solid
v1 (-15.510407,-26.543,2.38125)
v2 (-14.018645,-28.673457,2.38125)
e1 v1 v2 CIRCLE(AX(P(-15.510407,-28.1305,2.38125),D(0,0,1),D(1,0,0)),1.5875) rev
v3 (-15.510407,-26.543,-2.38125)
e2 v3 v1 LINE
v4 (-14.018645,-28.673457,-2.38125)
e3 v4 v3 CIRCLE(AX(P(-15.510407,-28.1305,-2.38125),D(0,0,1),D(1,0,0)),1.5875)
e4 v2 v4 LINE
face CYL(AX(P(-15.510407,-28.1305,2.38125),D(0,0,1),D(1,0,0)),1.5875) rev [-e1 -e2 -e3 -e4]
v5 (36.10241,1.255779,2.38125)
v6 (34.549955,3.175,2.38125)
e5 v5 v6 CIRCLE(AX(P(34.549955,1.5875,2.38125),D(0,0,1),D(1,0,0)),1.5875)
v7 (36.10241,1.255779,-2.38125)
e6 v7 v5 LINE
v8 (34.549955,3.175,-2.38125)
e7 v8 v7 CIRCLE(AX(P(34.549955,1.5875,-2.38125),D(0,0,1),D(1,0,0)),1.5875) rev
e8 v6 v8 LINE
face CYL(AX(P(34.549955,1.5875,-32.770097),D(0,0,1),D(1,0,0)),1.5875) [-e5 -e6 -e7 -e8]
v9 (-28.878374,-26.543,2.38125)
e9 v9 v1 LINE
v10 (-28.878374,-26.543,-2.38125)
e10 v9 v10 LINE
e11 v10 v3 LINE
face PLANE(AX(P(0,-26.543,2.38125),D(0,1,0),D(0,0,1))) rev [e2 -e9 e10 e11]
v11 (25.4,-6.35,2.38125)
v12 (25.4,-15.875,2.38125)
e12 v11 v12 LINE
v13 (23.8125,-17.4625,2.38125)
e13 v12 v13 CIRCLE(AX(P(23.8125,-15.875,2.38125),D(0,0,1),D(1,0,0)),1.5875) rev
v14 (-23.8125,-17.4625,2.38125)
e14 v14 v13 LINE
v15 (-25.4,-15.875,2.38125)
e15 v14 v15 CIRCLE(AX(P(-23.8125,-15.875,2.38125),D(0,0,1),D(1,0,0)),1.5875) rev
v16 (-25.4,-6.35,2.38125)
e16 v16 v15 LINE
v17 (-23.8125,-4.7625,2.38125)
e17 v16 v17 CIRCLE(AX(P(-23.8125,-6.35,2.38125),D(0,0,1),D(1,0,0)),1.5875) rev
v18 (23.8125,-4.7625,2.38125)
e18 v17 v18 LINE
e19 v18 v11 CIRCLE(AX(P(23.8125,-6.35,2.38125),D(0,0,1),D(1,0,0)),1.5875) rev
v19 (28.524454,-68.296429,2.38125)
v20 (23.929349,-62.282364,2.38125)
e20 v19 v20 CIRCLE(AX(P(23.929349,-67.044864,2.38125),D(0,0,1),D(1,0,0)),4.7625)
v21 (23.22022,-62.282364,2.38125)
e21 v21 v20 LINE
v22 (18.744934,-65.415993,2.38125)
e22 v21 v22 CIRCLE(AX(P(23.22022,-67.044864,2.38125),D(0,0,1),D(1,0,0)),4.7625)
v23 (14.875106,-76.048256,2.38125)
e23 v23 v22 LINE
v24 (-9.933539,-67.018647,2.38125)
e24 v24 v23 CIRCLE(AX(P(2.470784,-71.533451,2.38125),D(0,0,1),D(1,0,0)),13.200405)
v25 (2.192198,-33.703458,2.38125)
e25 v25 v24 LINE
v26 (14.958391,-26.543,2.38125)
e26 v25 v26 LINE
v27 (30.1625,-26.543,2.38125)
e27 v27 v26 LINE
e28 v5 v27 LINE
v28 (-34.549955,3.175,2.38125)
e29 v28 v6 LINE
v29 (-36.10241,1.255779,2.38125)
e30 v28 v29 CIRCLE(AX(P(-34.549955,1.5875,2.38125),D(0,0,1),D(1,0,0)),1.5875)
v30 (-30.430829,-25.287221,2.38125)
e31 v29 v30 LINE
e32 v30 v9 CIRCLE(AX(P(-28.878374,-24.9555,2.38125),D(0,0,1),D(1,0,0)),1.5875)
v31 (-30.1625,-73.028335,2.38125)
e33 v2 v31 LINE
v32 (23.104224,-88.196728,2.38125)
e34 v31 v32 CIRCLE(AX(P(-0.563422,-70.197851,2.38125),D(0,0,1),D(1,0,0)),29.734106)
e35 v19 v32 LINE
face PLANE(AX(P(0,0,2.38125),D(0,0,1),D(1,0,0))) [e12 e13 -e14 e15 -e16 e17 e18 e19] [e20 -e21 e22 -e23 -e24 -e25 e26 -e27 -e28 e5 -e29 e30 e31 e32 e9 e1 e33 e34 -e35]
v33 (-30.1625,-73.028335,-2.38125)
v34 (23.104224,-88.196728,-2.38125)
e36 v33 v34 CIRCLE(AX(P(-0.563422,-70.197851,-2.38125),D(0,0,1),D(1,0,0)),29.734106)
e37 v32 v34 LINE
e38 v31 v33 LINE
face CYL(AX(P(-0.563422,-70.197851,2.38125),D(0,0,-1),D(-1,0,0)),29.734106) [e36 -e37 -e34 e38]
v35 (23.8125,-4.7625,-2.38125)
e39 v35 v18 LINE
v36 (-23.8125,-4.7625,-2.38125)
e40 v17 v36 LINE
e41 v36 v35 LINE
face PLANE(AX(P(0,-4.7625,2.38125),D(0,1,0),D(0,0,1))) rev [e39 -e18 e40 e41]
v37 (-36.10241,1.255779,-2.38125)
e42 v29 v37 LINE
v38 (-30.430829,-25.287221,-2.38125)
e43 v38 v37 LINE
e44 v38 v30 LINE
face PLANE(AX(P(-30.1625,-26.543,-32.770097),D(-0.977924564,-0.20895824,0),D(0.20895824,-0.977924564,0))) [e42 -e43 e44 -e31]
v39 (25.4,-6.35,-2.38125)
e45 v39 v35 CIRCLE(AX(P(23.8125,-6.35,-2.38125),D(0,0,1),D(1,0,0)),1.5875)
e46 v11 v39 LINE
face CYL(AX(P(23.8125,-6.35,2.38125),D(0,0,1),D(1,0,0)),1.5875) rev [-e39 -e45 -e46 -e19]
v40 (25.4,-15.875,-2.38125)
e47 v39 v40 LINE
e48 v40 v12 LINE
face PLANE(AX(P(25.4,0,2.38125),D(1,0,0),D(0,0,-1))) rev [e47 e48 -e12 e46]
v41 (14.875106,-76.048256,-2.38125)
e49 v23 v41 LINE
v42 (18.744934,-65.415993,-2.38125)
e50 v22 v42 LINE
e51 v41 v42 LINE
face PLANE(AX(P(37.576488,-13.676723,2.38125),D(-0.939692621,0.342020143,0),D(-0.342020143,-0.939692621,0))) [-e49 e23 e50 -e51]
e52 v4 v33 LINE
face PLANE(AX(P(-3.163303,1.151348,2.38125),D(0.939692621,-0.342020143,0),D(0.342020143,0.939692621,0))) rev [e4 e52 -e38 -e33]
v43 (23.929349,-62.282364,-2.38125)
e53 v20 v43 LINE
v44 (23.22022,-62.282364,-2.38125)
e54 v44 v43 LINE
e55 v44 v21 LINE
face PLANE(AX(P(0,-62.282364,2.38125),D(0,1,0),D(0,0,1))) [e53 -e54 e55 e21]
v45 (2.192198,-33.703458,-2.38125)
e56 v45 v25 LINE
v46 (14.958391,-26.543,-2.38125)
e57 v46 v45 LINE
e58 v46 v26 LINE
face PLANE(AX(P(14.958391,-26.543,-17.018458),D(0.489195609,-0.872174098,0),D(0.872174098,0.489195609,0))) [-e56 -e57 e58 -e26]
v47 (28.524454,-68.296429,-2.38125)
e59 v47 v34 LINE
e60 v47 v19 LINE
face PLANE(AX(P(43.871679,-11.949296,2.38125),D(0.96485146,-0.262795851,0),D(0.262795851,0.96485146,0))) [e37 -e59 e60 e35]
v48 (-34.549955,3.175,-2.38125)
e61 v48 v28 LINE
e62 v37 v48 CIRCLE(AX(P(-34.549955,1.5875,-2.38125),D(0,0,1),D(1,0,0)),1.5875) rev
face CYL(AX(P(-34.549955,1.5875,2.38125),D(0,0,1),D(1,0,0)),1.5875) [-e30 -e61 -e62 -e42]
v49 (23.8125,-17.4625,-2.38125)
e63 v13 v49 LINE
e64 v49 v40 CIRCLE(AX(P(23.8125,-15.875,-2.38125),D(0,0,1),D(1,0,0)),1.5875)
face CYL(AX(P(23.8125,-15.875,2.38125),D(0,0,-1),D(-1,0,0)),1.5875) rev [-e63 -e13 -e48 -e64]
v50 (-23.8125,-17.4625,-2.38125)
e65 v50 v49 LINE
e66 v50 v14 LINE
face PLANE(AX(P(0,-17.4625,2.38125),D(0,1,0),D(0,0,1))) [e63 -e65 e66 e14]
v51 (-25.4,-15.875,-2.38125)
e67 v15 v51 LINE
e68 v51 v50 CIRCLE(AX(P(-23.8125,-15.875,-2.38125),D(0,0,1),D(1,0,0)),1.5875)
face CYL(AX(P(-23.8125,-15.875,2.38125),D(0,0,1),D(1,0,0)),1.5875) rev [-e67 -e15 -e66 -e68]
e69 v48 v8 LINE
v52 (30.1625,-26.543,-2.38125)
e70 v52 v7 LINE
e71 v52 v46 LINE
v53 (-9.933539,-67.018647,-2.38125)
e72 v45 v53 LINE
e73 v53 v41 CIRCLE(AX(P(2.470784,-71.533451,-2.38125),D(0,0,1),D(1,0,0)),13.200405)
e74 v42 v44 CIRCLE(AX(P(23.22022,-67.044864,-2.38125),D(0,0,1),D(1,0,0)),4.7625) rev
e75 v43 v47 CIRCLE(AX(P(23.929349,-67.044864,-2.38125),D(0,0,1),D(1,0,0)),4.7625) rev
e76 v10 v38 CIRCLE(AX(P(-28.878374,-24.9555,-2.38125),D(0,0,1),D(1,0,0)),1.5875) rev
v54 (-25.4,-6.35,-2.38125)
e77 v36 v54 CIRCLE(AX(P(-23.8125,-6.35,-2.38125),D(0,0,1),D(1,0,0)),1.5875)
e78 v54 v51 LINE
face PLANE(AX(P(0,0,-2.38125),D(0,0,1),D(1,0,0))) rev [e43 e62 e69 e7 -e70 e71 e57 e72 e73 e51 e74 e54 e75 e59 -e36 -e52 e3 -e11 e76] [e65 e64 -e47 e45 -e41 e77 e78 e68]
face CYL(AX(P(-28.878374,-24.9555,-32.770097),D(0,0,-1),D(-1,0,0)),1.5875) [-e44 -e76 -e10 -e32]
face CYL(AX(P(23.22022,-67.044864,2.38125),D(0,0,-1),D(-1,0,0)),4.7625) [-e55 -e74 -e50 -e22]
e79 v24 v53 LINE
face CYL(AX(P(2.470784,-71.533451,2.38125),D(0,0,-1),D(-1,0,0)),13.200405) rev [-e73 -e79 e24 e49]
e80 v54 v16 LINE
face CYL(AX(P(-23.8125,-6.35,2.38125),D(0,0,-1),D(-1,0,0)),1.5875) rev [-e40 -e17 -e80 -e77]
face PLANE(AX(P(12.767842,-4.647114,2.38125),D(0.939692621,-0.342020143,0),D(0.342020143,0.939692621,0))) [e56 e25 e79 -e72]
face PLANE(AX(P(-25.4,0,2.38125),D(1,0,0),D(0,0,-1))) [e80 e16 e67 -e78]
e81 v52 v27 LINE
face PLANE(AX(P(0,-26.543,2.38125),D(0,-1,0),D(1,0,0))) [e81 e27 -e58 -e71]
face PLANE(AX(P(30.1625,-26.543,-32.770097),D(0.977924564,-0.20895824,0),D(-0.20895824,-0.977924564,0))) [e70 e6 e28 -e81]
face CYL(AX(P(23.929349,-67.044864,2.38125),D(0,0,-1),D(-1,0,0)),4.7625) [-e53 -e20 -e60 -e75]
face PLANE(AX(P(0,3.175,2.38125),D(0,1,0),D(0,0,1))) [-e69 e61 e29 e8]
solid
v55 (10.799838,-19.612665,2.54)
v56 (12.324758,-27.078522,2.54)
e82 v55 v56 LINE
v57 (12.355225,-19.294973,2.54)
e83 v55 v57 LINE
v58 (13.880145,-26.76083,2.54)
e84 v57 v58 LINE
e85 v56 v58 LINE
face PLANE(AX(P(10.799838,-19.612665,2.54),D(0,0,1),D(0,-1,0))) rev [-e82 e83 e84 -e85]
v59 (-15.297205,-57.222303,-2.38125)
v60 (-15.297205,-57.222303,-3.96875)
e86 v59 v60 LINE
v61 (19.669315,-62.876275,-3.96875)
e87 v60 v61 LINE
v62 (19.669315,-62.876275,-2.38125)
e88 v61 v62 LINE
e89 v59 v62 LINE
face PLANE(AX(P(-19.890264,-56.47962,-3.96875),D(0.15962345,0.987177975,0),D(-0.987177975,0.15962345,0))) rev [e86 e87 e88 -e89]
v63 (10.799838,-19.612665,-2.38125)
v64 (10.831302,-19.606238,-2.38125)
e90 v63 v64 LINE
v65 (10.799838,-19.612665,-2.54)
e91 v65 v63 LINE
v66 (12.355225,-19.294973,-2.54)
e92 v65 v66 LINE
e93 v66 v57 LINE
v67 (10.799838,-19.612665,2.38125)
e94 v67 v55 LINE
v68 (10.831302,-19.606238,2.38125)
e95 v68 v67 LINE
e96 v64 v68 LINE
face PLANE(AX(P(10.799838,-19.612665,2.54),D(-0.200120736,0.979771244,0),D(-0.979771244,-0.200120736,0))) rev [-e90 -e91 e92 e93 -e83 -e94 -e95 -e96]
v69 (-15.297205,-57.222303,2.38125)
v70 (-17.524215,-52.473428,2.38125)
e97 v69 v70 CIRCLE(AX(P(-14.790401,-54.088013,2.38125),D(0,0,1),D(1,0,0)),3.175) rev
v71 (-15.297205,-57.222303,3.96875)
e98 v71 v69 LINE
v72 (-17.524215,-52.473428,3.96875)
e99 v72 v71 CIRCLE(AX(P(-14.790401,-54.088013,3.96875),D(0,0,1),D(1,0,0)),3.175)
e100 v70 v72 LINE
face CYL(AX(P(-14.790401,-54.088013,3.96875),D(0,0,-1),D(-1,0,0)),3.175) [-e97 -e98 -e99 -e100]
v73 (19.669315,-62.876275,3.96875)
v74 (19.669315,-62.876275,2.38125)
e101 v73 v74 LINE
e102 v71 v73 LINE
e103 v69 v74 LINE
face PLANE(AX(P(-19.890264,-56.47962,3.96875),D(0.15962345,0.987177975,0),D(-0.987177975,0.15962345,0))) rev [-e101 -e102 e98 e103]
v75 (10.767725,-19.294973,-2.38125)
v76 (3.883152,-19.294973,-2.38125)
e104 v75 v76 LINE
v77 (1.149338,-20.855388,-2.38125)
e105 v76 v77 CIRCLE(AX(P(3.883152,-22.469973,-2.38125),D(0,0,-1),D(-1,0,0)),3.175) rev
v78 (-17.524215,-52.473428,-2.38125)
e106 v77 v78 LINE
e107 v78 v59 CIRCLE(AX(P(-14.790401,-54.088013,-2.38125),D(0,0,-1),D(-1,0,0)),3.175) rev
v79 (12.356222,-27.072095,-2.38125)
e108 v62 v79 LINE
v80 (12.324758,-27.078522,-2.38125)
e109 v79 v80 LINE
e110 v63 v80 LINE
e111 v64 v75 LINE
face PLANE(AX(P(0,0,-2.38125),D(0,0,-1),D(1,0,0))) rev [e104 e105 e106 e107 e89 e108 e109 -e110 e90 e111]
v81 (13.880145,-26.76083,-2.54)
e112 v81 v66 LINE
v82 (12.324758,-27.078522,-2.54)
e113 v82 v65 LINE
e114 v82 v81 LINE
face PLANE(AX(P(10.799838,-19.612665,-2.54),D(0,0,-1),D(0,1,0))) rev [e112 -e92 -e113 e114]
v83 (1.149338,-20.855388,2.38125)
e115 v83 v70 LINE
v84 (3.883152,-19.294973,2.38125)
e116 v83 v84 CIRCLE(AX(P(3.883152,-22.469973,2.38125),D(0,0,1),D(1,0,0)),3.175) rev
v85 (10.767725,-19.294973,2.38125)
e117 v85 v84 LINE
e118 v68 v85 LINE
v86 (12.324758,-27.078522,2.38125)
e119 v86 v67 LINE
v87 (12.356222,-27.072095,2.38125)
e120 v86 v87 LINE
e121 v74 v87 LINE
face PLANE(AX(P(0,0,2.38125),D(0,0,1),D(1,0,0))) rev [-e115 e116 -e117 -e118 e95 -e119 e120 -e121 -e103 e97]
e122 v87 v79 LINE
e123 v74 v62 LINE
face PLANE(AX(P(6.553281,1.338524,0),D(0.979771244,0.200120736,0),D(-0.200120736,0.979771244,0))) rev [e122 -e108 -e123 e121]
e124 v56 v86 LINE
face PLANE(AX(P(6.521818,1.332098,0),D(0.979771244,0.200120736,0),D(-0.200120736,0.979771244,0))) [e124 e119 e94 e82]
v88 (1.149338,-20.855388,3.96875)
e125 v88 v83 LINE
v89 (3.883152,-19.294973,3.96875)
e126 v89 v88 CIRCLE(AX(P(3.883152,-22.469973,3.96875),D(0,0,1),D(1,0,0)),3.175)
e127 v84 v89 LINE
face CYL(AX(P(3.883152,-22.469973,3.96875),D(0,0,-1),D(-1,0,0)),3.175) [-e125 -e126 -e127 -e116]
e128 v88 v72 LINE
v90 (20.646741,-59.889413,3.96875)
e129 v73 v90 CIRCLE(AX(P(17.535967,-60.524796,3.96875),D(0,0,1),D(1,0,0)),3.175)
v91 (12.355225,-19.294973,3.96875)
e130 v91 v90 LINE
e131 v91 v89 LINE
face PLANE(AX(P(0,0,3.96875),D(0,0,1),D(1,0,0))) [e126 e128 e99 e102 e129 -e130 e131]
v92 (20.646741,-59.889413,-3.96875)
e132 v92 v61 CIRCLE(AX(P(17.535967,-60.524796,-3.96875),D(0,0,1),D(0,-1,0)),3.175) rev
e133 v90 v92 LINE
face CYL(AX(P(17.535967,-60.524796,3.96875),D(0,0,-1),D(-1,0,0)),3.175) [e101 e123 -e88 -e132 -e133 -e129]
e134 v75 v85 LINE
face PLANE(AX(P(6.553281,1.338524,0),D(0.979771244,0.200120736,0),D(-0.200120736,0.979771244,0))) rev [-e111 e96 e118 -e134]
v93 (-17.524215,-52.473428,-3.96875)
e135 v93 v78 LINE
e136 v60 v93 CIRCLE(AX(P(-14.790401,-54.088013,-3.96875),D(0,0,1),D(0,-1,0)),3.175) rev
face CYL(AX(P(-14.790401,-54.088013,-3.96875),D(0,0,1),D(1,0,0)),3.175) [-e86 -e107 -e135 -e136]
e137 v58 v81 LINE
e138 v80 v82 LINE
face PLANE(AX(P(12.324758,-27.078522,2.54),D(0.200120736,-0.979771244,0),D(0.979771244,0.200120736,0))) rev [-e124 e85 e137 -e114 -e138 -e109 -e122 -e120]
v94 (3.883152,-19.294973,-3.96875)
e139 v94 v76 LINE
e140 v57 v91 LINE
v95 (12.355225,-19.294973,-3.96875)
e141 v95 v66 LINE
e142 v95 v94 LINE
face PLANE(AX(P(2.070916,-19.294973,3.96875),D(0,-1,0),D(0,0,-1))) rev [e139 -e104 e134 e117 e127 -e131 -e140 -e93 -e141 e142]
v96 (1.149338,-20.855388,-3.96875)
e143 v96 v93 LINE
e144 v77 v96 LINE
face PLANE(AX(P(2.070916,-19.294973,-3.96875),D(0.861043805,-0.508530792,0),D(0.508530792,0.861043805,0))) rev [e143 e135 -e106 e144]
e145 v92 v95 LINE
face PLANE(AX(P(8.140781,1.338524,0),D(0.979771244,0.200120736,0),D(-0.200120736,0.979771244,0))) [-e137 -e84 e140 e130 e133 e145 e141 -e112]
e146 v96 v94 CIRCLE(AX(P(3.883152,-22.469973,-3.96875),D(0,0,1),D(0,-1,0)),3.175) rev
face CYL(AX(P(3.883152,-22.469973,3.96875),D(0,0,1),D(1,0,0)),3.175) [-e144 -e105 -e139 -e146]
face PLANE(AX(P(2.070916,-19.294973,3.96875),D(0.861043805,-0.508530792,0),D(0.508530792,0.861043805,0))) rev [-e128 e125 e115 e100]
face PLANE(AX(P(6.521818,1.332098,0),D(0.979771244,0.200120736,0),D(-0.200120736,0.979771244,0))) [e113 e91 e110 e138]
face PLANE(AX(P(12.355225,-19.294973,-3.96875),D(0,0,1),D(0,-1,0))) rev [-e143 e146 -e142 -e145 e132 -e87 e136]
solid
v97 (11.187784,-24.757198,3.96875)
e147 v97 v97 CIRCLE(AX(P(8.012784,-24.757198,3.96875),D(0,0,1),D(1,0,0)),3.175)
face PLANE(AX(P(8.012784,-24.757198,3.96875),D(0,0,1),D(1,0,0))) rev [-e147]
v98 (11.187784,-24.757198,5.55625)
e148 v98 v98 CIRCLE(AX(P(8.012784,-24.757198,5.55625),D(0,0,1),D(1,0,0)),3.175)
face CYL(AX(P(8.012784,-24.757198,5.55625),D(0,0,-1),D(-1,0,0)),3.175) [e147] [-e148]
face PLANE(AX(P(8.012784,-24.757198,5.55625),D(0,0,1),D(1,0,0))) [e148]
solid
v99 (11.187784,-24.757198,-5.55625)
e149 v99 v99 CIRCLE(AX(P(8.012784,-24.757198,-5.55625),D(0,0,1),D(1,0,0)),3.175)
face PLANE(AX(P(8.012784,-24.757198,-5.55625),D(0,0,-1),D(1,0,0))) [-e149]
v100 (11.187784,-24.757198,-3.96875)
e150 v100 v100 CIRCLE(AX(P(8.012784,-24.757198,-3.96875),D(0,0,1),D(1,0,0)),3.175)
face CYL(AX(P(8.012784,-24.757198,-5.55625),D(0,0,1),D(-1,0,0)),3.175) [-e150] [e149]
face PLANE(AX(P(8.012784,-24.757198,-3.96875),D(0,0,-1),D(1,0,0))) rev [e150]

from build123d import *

# Parameters (mm, degrees)
SKETCH1_W           = 60.325
SKETCH1_H           = 3.175
SKETCH1_W_2         = 50.8
SKETCH1_H_2         = 12.7
BOSS_EXTRUDE1_DEPTH = 2.38125
BOSS_EXTRUDE2_DEPTH = 1.5875
SKETCH3_W           = 7.9375
SKETCH3_H           = 44.481099137
BOSS_EXTRUDE3_DEPTH = 1.5875
FILLET1_R           = 3.175
SKETCH4_W           = 5.08
SKETCH4_H           = 7.62
CUT_EXTRUDE1_DEPTH  = 1.5875
SKETCH5_R           = 3.175
BOSS_EXTRUDE4_DEPTH = 1.5875
BOSS_EXTRUDE5_DEPTH = 4.7625
FILLET5_R           = 1.5875
BOSS_EXTRUDE6_DEPTH = 4.7625
FILLET6_R           = 1.5875
FILLET7_R           = 4.7625


with BuildPart() as part:
    # Sketch1 → Boss-Extrude1 (new, symmetric)
    # profile 1 of 2: a face of its own
    with BuildSketch(Plane.XY):
        with Locations((0, 1.5875)):
            Rectangle(SKETCH1_W, SKETCH1_H)
    # profile 2 of 2: a face of its own
    with BuildSketch(Plane.XY):
        with BuildLine():
            Line((30.1625, 0), (-30.1625, 0))
            Line((-30.1625, 0), (-30.1625, -26.543))
            Line((-30.1625, -26.543), (-13.24322167, -26.543))
            Line((-13.24322167, -26.543), (-30.1625, -73.028335164))
            ThreePointArc((-30.1625, -73.028335164), (-8.706855369, -98.7950809), (23.104224388, -88.196728338))
            Line((23.104224388, -88.196728338), (30.1625, -62.282363628))
            Line((30.1625, -62.282363628), (19.885481288, -62.282363628))
            Line((19.885481288, -62.282363628), (14.875106331, -76.048255685))
            ThreePointArc((14.875106331, -76.048255685), (-2.044020786, -83.937774229), (-9.93353933, -67.018647112))
            Line((-9.93353933, -67.018647112), (4.798391431, -26.543))
            Line((4.798391431, -26.543), (30.1625, -26.543))
            Line((30.1625, -26.543), (30.1625, 0))
        make_face()
        with Locations((0, -11.1125)):
            Rectangle(SKETCH1_W_2, SKETCH1_H_2, mode=Mode.SUBTRACT)
    extrude(amount=BOSS_EXTRUDE1_DEPTH, both=True)

    # Sketch6 → Boss-Extrude5 (add)
    with BuildSketch(Plane.XY.offset(2.38125)):
        Polygon((14.958391431, -26.543), (2.192197939, -33.70345777), (4.798391431, -26.543), align=None)
    extrude(amount=-BOSS_EXTRUDE5_DEPTH)

    # Fillet5
    fillet5_edges = [part.edges().sort_by_distance(p)[0] for p in [
        (-25.4, -4.7625, 0),
        (-25.4, -17.4625, 0),
        (25.4, -17.4625, 0),
        (25.4, -4.7625, 0),
    ]]
    fillet(fillet5_edges, radius=FILLET5_R)


with BuildPart() as body_2:
    # Sketch2 → Boss-Extrude2 (new body)
    with BuildSketch(Plane.XY.offset(2.38125)):
        Polygon((2.070915662, -19.294973045), (-19.890264434, -56.479620237), (19.669315265, -62.876274894), (10.767724981, -19.294973045), align=None)
    extrude(amount=BOSS_EXTRUDE2_DEPTH)


with BuildPart() as body_3:
    # Mirror1: mirrored copy
    add(body_2.part.mirror(Plane.XY))


with BuildPart() as body_2_1:
    add(body_2.part)

    add(body_3.part)  # Boss-Extrude3 merges body 3
    # Sketch3 → Boss-Extrude3 (add, along a direction that is not the sketch's normal)
    with BuildSketch(Plane(origin=(6.553281388, 1.338524171, 0), x_dir=(0, 0, -1), z_dir=(0.9797712442921276, 0.2001207357028661, 0))):
        with Locations((0, -43.300054363)):
            Rectangle(SKETCH3_W, SKETCH3_H)
    extrude(amount=BOSS_EXTRUDE3_DEPTH, dir=(1, 0, 0))

    # Fillet1
    # the kernel refuses this fillet: 3.175 mm, written as the material it takes off along each edge
    with BuildSketch(Plane(origin=(-19.890264434, -56.479620237, 9.250541142), x_dir=(0.5085307915682564, 0.8610438049408187, 0), z_dir=(0, 0, -1))) as fillet1_piece_1:
        with BuildLine():
            CenterArc((FILLET1_R * 1.46542250607, FILLET1_R), FILLET1_R, 158.619024622, 111.380975378)
            Line((FILLET1_R * 0.534245587006, FILLET1_R * 1.36456761432), (FILLET1_R * 0.515622048625, FILLET1_R * 1.37185896661))
            Line((FILLET1_R * 0.515622048625, FILLET1_R * 1.37185896661), (-FILLET1_R * 0.0293084501213, -FILLET1_R * 0.02))
            Line((-FILLET1_R * 0.0293084501213, -FILLET1_R * 0.02), (FILLET1_R * 1.46542250607, -FILLET1_R * 0.02))
            Line((FILLET1_R * 1.46542250607, -FILLET1_R * 0.02), (FILLET1_R * 1.46542250607, 0))
        make_face()
    extrude(amount=24.851082284, mode=Mode.SUBTRACT)
    with BuildSketch(Plane(origin=(21.256815265, -62.876274894, -11.590075114), x_dir=(-0.20012073570286557, 0.9797712442921276, 0), z_dir=(0, 0, 1))) as fillet1_piece_2:
        with BuildLine():
            CenterArc((3.048530046, 3.175), FILLET1_R, 210.671448693, 59.328551307)
            Line((0.317691668, 1.55538685), (0.2630749, 1.522994587))
            ThreePointArc((0.2630749, 1.522994587), (0.09663036, 0.790401092), (-0.062215474, 0.012707667))
            Line((-0.062215474, 0.012707667), (0, -0.0635))
            Line((0, -0.0635), (3.048530046, -0.0635))
            Line((3.048530046, -0.0635), (3.048530046, 0))
        make_face()
    extrude(amount=23.180150228, mode=Mode.SUBTRACT)
    with BuildSketch(Plane(origin=(-19.890264434, -56.479620237, -9.250541142), x_dir=(0.5085307915682564, 0.8610438049408187, 0), z_dir=(0, 0, 1))) as fillet1_piece_3:
        with BuildLine():
            CenterArc((FILLET1_R * 1.46542250607, -FILLET1_R), FILLET1_R, 90, 111.380975378)
            Line((FILLET1_R * 0.534245587006, -FILLET1_R * 1.36456761432), (FILLET1_R * 0.515622048625, -FILLET1_R * 1.37185896661))
            Line((FILLET1_R * 0.515622048625, -FILLET1_R * 1.37185896661), (-FILLET1_R * 0.0293084501213, FILLET1_R * 0.02))
            Line((-FILLET1_R * 0.0293084501213, FILLET1_R * 0.02), (FILLET1_R * 1.46542250607, FILLET1_R * 0.02))
            Line((FILLET1_R * 1.46542250607, FILLET1_R * 0.02), (FILLET1_R * 1.46542250607, 0))
        make_face()
    extrude(amount=24.851082284, mode=Mode.SUBTRACT)
    with BuildSketch(Plane(origin=(2.070915662, -19.294973045, 2.149340453), x_dir=(-0.5085307915682565, -0.8610438049408186, 0), z_dir=(0, 0, -1))) as fillet1_piece_4:
        with BuildLine():
            CenterArc((FILLET1_R * 0.570783049145, -FILLET1_R), FILLET1_R, 90, 59.433984029)
            Line((-FILLET1_R * 0.290260755796, -FILLET1_R * 0.491469208432), (-FILLET1_R * 0.307481631894, -FILLET1_R * 0.4812985926))
            Line((-FILLET1_R * 0.307481631894, -FILLET1_R * 0.4812985926), (-FILLET1_R * 0.0114156609829, FILLET1_R * 0.02))
            Line((-FILLET1_R * 0.0114156609829, FILLET1_R * 0.02), (FILLET1_R * 0.570783049145, FILLET1_R * 0.02))
            Line((FILLET1_R * 0.570783049145, FILLET1_R * 0.02), (FILLET1_R * 0.570783049145, 0))
        make_face()
    extrude(amount=10.648680905, mode=Mode.SUBTRACT)
    with BuildSketch(Plane(origin=(2.070915662, -19.294973045, -2.149340453), x_dir=(-0.5085307915682565, -0.8610438049408186, 0), z_dir=(0, 0, 1))) as fillet1_piece_5:
        with BuildLine():
            CenterArc((FILLET1_R * 0.570783049145, FILLET1_R), FILLET1_R, 210.566015971, 59.433984029)
            Line((-FILLET1_R * 0.290260755796, FILLET1_R * 0.491469208432), (-FILLET1_R * 0.307481631894, FILLET1_R * 0.4812985926))
            Line((-FILLET1_R * 0.307481631894, FILLET1_R * 0.4812985926), (-FILLET1_R * 0.0114156609829, -FILLET1_R * 0.02))
            Line((-FILLET1_R * 0.0114156609829, -FILLET1_R * 0.02), (FILLET1_R * 0.570783049145, -FILLET1_R * 0.02))
            Line((FILLET1_R * 0.570783049145, -FILLET1_R * 0.02), (FILLET1_R * 0.570783049145, 0))
        make_face()
    extrude(amount=10.648680905, mode=Mode.SUBTRACT)

    # Sketch4 → Cut-Extrude1 (cut)
    with BuildSketch(Plane(origin=(8.077204698, 1.649789332, 0), x_dir=(0, 0, -1), z_dir=(0.9797712442921276, 0.20012073570286604, 0))):
        with Locations((0, -25.187196462)):
            Rectangle(SKETCH4_W, SKETCH4_H)
    extrude(amount=-CUT_EXTRUDE1_DEPTH, mode=Mode.SUBTRACT)


with BuildPart() as body_3_2:
    # Sketch5 → Boss-Extrude4 (new body)
    with BuildSketch(Plane.XY.offset(3.96875)):
        with Locations((8.012784298, -24.757197764)):
            Circle(SKETCH5_R)
    extrude(amount=BOSS_EXTRUDE4_DEPTH)


with BuildPart() as body_4:
    # Mirror2: mirrored copy
    add(body_3_2.part.mirror(Plane.XY))


with BuildPart() as body_5:
    # Sketch7 → Boss-Extrude6 (new body)
    with BuildSketch(Plane.XY.offset(2.38125)):
        Polygon((-30.1625, -26.543), (-36.5125, 3.175), (-30.1625, 3.175), align=None)
    extrude(amount=-BOSS_EXTRUDE6_DEPTH)


with BuildPart() as body_6:
    # Mirror3: mirrored copy
    add(body_5.part.mirror(Plane(origin=(0, 0, 0), x_dir=(0, 0, 1), z_dir=(1, 0, 0))))


with BuildPart() as part_1:
    add(part.part)

    # Combine1: union body 6, body 5
    add(body_6.part)
    add(body_5.part)

    # Fillet6
    fillet6_edges = [part_1.edges().sort_by_distance(p)[0] for p in [
        (-30.1625, -26.543, 0),
        (-36.5125, 3.175, 0),
        (-13.24322167, -26.543, 0),
        (36.5125, 3.175, 0),
    ]]
    fillet(fillet6_edges, radius=FILLET6_R)

    # Fillet7
    fillet7_edges = [part_1.edges().sort_by_distance(p)[0] for p in [
        (19.885481288, -62.282363628, 0),
        (30.1625, -62.282363628, 0),
    ]]
    fillet(fillet7_edges, radius=FILLET7_R)


solid = Compound([body_2_1.part, body_3_2.part, body_4.part, part_1.part])
